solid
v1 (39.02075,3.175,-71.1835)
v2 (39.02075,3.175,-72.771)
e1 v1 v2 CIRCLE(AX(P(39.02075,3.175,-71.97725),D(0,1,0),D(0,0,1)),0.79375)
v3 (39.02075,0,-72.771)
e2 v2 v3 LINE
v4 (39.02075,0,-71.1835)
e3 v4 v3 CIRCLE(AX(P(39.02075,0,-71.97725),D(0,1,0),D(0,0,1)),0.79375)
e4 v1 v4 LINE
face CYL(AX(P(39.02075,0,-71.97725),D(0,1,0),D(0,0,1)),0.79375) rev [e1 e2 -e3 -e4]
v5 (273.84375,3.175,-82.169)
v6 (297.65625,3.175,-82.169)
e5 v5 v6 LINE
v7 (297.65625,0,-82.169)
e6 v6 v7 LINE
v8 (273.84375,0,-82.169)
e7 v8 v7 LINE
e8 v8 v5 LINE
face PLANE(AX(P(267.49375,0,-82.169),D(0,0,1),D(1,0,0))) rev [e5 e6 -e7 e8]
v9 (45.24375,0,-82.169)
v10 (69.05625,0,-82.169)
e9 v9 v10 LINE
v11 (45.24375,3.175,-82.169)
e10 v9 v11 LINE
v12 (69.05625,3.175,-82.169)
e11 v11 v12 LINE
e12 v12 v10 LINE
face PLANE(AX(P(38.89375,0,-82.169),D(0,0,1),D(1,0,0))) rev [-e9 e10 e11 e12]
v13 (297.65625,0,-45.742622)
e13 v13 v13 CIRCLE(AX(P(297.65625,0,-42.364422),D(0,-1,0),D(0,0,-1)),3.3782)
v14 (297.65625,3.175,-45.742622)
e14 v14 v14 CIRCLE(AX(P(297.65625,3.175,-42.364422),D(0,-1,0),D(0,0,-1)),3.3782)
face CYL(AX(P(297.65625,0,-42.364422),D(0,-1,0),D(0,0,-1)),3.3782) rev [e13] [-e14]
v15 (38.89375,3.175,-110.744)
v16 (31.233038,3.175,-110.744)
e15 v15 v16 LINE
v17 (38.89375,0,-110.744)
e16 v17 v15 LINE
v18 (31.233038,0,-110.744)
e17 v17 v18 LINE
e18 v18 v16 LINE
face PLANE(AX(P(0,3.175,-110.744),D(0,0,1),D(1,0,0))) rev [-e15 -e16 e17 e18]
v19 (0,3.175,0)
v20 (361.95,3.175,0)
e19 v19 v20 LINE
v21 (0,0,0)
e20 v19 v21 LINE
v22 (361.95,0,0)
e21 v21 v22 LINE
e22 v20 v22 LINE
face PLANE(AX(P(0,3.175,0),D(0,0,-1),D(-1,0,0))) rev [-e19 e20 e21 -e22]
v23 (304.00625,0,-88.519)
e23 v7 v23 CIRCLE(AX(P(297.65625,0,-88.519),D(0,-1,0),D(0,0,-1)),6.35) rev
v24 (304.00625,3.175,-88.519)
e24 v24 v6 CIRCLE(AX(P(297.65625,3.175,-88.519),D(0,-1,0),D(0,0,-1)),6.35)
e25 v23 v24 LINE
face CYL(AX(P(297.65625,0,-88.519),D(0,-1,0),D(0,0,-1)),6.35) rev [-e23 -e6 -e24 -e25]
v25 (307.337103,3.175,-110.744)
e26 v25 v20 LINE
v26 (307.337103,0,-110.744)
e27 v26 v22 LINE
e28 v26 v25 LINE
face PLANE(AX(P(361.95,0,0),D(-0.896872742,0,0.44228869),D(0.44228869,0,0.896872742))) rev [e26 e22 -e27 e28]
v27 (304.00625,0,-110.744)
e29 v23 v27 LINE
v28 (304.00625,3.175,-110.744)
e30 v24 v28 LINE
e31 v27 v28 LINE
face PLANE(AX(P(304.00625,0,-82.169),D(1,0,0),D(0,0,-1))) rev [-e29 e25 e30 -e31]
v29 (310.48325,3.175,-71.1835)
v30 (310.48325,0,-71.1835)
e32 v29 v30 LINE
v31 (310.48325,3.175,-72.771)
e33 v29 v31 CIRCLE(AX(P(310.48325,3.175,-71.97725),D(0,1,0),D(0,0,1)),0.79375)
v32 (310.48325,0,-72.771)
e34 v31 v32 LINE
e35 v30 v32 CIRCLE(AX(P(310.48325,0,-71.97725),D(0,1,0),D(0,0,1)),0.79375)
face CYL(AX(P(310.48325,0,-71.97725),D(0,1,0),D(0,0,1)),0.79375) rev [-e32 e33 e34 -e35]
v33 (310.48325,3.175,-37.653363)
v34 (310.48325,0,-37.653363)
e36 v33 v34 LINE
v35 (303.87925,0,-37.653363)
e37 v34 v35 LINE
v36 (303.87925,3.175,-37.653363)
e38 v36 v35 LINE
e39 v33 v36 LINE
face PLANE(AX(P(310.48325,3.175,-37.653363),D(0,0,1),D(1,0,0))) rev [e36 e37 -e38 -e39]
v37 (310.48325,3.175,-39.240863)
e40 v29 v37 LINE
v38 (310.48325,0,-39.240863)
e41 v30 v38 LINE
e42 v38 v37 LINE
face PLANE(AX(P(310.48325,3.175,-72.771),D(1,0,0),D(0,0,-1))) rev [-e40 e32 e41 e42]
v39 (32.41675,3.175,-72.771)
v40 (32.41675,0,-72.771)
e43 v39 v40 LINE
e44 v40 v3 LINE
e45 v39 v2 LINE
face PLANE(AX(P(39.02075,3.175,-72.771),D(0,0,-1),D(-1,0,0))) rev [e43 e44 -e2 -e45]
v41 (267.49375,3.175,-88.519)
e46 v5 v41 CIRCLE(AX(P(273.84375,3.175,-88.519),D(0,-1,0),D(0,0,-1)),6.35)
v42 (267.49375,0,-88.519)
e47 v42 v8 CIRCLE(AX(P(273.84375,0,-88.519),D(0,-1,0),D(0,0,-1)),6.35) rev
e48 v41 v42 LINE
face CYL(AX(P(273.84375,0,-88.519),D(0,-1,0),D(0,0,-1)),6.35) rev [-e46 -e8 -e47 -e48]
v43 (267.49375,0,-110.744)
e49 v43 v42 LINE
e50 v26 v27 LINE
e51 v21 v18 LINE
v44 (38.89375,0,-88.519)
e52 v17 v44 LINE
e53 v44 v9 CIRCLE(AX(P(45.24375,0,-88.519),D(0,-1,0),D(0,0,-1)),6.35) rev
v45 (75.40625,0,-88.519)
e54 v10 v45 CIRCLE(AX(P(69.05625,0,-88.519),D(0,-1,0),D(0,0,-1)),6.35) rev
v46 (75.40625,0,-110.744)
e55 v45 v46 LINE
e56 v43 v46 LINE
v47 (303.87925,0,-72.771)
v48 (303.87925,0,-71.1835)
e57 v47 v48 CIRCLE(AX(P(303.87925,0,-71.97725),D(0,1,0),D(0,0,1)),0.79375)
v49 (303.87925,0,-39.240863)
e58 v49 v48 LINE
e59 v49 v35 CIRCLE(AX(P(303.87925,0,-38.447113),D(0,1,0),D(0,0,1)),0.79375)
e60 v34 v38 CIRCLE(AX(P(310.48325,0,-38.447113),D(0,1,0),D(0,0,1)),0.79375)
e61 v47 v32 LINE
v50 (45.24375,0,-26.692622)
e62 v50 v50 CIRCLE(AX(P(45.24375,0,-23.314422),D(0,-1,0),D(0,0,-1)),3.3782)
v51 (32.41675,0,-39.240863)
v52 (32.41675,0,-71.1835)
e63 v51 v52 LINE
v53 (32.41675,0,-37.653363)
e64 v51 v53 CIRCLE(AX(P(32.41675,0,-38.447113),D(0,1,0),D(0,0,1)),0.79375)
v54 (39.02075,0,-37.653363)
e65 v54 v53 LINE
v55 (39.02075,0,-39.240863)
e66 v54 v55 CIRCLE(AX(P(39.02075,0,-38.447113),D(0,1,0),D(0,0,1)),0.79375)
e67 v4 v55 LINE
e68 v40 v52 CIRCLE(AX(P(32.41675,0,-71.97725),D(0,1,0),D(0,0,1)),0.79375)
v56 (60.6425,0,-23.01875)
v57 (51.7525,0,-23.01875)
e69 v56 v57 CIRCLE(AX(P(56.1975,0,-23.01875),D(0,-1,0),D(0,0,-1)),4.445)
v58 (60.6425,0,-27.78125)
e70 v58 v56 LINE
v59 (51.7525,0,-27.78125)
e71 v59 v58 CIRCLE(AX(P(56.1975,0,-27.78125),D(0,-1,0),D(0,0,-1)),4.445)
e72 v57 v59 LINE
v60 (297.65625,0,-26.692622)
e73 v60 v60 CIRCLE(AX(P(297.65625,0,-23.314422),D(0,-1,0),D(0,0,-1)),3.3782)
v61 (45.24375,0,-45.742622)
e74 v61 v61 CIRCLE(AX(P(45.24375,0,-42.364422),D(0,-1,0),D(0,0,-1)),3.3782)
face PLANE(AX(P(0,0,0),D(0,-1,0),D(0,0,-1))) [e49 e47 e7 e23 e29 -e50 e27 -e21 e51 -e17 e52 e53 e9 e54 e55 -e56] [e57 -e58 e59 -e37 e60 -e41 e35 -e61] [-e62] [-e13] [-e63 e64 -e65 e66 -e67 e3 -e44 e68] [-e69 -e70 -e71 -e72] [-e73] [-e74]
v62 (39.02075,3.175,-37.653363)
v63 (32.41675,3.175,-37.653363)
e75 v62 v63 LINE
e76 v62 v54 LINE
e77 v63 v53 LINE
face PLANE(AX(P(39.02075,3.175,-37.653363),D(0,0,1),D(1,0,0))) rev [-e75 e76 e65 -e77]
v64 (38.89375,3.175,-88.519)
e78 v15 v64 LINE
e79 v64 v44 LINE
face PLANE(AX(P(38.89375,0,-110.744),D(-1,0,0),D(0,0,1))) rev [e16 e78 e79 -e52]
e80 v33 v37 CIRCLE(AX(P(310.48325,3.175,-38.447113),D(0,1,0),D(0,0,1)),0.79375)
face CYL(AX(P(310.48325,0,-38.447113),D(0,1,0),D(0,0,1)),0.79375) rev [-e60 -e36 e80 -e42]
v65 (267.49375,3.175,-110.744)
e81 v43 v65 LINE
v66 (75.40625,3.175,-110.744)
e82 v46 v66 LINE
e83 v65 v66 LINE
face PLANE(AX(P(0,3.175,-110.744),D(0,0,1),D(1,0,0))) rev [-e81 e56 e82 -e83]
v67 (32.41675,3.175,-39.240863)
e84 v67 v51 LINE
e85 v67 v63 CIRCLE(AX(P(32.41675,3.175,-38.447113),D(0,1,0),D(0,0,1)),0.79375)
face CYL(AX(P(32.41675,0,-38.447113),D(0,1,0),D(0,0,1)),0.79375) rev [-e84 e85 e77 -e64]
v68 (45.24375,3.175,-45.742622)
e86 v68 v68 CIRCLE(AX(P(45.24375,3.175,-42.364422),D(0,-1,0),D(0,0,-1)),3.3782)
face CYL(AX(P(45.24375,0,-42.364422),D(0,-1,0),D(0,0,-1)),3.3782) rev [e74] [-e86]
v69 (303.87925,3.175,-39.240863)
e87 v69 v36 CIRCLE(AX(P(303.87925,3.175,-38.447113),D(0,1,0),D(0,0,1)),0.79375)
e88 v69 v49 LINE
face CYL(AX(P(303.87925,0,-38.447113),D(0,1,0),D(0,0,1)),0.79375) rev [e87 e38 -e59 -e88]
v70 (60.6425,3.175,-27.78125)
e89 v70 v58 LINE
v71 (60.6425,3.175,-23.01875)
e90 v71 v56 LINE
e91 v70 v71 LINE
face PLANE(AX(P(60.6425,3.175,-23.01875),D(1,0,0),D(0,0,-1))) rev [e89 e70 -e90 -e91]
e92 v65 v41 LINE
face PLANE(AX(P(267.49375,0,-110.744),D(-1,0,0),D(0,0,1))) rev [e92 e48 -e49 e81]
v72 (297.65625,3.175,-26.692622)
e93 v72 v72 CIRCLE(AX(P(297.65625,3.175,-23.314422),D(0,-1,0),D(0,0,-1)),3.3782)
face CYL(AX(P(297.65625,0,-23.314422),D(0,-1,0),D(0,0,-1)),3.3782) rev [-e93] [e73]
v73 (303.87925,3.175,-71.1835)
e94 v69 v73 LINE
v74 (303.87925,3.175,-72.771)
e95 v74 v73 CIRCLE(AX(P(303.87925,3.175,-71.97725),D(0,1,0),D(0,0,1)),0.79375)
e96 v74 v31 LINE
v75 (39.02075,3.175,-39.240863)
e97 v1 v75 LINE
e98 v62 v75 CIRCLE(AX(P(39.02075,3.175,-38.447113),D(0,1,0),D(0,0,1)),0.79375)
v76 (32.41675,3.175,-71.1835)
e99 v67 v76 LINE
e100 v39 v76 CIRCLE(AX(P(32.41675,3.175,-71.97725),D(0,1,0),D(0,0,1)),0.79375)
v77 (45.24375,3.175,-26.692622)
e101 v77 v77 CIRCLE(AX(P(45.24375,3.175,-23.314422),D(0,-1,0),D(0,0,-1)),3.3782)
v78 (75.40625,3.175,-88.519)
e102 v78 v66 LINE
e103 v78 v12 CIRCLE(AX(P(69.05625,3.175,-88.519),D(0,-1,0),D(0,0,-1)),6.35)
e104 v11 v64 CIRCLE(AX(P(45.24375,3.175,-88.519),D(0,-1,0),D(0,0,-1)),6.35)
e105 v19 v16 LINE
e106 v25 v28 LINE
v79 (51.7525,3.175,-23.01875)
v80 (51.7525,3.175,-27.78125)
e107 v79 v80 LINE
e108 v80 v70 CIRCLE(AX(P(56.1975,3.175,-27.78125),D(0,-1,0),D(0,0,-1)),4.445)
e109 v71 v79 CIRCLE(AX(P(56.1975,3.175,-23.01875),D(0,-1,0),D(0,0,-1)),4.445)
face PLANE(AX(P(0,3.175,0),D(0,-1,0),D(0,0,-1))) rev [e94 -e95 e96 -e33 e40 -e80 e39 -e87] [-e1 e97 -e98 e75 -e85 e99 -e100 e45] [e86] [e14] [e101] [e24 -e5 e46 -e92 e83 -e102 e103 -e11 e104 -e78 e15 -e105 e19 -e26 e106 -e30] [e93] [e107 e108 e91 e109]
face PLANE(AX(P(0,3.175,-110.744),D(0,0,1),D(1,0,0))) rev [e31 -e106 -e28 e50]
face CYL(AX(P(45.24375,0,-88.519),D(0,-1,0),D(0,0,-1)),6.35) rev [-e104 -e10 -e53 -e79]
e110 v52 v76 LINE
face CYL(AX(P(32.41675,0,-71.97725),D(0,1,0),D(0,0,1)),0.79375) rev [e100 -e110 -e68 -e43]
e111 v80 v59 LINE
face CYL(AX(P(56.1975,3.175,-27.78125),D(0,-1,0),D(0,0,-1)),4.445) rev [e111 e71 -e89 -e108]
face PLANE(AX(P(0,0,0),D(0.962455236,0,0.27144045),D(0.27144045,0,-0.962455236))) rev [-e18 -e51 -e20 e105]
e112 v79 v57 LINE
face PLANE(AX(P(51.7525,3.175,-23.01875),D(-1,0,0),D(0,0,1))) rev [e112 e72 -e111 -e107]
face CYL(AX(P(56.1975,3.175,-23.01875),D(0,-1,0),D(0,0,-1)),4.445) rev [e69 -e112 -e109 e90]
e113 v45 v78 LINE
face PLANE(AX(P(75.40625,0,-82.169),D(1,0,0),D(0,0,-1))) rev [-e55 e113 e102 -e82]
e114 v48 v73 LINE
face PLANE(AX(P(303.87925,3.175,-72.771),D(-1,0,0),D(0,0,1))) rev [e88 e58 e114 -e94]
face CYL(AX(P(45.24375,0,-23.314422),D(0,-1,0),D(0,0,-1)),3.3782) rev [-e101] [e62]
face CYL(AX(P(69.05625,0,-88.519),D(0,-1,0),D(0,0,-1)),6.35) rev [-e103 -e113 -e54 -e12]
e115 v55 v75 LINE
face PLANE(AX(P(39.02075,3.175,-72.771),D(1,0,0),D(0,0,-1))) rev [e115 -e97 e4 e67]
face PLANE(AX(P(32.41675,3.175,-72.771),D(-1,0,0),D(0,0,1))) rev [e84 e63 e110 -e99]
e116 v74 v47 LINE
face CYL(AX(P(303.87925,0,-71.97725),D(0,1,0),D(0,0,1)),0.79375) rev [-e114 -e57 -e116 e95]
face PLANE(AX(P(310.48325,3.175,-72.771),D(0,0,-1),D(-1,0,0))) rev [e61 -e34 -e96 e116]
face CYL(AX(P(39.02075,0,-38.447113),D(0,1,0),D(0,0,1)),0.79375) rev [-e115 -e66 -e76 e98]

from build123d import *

# Parameters (mm, degrees)
SKETCH1_W                       = 361.95
SKETCH1_H                       = 110.744
BOSS_EXTRUDE1_DEPTH             = 3.175
CUT_EXTRUDE1_DEPTH              = 379.526243028
SKETCH3_W                       = 36.5125
SKETCH3_H                       = 28.575
CUT_EXTRUDE2_DEPTH              = 379.526243028
FILLET1_R                       = 6.35
F_1_4_CLEARANCE_HOLE1_OUTLINE_R = 3.3782
F_1_4_CLEARANCE_HOLE1_DEPTH     = 3.175
CUT_EXTRUDE6_DEPTH              = 3.175


# Read off the part's stored shape, not the designer's step: 1/4 Clearance Hole1, Cut-Extrude6
with BuildPart() as part:
    # Sketch1 → Boss-Extrude1 (new body)
    with BuildSketch(Plane(origin=(0, 0, 0), x_dir=(1, 0, 0), z_dir=(0, 1, 0))):
        with Locations((180.975, 55.372)):
            Rectangle(SKETCH1_W, SKETCH1_H)
    extrude(amount=BOSS_EXTRUDE1_DEPTH)

    # Sketch2 → Cut-Extrude1 (cut, through all)
    with BuildSketch(Plane(origin=(0, 3.175, 0), x_dir=(1, 0, 0), z_dir=(0, 1, 0))):
        Polygon((0, 0), (31.233038214, 110.744), (0, 110.744), align=None)
        Polygon((361.95, 0), (307.33710294, 110.744), (361.95, 110.744), align=None)
    extrude(amount=-CUT_EXTRUDE1_DEPTH, mode=Mode.SUBTRACT)

    # Sketch3 → Cut-Extrude2 (cut, through all)
    with BuildSketch(Plane(origin=(0, 3.175, 0), x_dir=(1, 0, 0), z_dir=(0, 1, 0))):
        with Locations((57.15, 96.4565)):
            Rectangle(SKETCH3_W, SKETCH3_H)
        with Locations((285.75, 96.4565)):
            Rectangle(SKETCH3_W, SKETCH3_H)
    extrude(amount=-CUT_EXTRUDE2_DEPTH, mode=Mode.SUBTRACT)

    # Fillet1
    fillet1_edges = [part.edges().sort_by_distance(p)[0] for p in [
        (75.40625, 1.5875, -82.169),
        (38.89375, 1.5875, -82.169),
        (304.00625, 1.5875, -82.169),
        (267.49375, 1.5875, -82.169),
    ]]
    fillet(fillet1_edges, radius=FILLET1_R)

    # 1/4 Clearance Hole1 outline → 1/4 Clearance Hole1 (cut)
    with BuildSketch(Plane(origin=(0, 0, 0), x_dir=(1, 0, 0), z_dir=(0, 1, 0))):
        with BuildLine():
            ThreePointArc((51.7525, 23.01875), (56.1975, 18.57375), (60.6425, 23.01875))
            Line((60.6425, 23.01875), (60.6425, 27.78125))
            ThreePointArc((60.6425, 27.78125), (56.1975, 32.22625), (51.7525, 27.78125))
            Line((51.7525, 27.78125), (51.7525, 23.01875))
        make_face()
        with Locations((297.65625, 23.314421689)):
            Circle(F_1_4_CLEARANCE_HOLE1_OUTLINE_R)
        with Locations((297.65625, 42.364421689)):
            Circle(F_1_4_CLEARANCE_HOLE1_OUTLINE_R)
        with Locations((45.24375, 23.314421689)):
            Circle(F_1_4_CLEARANCE_HOLE1_OUTLINE_R)
        with Locations((45.24375, 42.364421689)):
            Circle(F_1_4_CLEARANCE_HOLE1_OUTLINE_R)
    extrude(amount=F_1_4_CLEARANCE_HOLE1_DEPTH, mode=Mode.SUBTRACT)

    # Cut-Extrude6 outline → Cut-Extrude6 (cut)
    with BuildSketch(Plane(origin=(0, 0, 0), x_dir=(1, 0, 0), z_dir=(0, 1, 0))):
        with BuildLine():
            ThreePointArc((39.02075, 71.1835), (39.8145, 71.97725), (39.02075, 72.771))
            Line((39.02075, 72.771), (32.41675, 72.771))
            ThreePointArc((32.41675, 72.771), (31.623, 71.97725), (32.41675, 71.1835))
            Line((32.41675, 71.1835), (32.41675, 39.240862815))
            ThreePointArc((32.41675, 39.240862815), (31.623, 38.447112815), (32.41675, 37.653362815))
            Line((32.41675, 37.653362815), (39.02075, 37.653362815))
            ThreePointArc((39.02075, 37.653362815), (39.8145, 38.447112815), (39.02075, 39.240862815))
            Line((39.02075, 39.240862815), (39.02075, 71.1835))
        make_face()
        with BuildLine():
            ThreePointArc((310.48325, 71.1835), (311.277, 71.97725), (310.48325, 72.771))
            Line((310.48325, 72.771), (303.87925, 72.771))
            ThreePointArc((303.87925, 72.771), (303.0855, 71.97725), (303.87925, 71.1835))
            Line((303.87925, 71.1835), (303.87925, 39.240862815))
            ThreePointArc((303.87925, 39.240862815), (303.0855, 38.447112815), (303.87925, 37.653362815))
            Line((303.87925, 37.653362815), (310.48325, 37.653362815))
            ThreePointArc((310.48325, 37.653362815), (311.277, 38.447112815), (310.48325, 39.240862815))
            Line((310.48325, 39.240862815), (310.48325, 71.1835))
        make_face()
    extrude(amount=CUT_EXTRUDE6_DEPTH, mode=Mode.SUBTRACT)


solid = part.part
